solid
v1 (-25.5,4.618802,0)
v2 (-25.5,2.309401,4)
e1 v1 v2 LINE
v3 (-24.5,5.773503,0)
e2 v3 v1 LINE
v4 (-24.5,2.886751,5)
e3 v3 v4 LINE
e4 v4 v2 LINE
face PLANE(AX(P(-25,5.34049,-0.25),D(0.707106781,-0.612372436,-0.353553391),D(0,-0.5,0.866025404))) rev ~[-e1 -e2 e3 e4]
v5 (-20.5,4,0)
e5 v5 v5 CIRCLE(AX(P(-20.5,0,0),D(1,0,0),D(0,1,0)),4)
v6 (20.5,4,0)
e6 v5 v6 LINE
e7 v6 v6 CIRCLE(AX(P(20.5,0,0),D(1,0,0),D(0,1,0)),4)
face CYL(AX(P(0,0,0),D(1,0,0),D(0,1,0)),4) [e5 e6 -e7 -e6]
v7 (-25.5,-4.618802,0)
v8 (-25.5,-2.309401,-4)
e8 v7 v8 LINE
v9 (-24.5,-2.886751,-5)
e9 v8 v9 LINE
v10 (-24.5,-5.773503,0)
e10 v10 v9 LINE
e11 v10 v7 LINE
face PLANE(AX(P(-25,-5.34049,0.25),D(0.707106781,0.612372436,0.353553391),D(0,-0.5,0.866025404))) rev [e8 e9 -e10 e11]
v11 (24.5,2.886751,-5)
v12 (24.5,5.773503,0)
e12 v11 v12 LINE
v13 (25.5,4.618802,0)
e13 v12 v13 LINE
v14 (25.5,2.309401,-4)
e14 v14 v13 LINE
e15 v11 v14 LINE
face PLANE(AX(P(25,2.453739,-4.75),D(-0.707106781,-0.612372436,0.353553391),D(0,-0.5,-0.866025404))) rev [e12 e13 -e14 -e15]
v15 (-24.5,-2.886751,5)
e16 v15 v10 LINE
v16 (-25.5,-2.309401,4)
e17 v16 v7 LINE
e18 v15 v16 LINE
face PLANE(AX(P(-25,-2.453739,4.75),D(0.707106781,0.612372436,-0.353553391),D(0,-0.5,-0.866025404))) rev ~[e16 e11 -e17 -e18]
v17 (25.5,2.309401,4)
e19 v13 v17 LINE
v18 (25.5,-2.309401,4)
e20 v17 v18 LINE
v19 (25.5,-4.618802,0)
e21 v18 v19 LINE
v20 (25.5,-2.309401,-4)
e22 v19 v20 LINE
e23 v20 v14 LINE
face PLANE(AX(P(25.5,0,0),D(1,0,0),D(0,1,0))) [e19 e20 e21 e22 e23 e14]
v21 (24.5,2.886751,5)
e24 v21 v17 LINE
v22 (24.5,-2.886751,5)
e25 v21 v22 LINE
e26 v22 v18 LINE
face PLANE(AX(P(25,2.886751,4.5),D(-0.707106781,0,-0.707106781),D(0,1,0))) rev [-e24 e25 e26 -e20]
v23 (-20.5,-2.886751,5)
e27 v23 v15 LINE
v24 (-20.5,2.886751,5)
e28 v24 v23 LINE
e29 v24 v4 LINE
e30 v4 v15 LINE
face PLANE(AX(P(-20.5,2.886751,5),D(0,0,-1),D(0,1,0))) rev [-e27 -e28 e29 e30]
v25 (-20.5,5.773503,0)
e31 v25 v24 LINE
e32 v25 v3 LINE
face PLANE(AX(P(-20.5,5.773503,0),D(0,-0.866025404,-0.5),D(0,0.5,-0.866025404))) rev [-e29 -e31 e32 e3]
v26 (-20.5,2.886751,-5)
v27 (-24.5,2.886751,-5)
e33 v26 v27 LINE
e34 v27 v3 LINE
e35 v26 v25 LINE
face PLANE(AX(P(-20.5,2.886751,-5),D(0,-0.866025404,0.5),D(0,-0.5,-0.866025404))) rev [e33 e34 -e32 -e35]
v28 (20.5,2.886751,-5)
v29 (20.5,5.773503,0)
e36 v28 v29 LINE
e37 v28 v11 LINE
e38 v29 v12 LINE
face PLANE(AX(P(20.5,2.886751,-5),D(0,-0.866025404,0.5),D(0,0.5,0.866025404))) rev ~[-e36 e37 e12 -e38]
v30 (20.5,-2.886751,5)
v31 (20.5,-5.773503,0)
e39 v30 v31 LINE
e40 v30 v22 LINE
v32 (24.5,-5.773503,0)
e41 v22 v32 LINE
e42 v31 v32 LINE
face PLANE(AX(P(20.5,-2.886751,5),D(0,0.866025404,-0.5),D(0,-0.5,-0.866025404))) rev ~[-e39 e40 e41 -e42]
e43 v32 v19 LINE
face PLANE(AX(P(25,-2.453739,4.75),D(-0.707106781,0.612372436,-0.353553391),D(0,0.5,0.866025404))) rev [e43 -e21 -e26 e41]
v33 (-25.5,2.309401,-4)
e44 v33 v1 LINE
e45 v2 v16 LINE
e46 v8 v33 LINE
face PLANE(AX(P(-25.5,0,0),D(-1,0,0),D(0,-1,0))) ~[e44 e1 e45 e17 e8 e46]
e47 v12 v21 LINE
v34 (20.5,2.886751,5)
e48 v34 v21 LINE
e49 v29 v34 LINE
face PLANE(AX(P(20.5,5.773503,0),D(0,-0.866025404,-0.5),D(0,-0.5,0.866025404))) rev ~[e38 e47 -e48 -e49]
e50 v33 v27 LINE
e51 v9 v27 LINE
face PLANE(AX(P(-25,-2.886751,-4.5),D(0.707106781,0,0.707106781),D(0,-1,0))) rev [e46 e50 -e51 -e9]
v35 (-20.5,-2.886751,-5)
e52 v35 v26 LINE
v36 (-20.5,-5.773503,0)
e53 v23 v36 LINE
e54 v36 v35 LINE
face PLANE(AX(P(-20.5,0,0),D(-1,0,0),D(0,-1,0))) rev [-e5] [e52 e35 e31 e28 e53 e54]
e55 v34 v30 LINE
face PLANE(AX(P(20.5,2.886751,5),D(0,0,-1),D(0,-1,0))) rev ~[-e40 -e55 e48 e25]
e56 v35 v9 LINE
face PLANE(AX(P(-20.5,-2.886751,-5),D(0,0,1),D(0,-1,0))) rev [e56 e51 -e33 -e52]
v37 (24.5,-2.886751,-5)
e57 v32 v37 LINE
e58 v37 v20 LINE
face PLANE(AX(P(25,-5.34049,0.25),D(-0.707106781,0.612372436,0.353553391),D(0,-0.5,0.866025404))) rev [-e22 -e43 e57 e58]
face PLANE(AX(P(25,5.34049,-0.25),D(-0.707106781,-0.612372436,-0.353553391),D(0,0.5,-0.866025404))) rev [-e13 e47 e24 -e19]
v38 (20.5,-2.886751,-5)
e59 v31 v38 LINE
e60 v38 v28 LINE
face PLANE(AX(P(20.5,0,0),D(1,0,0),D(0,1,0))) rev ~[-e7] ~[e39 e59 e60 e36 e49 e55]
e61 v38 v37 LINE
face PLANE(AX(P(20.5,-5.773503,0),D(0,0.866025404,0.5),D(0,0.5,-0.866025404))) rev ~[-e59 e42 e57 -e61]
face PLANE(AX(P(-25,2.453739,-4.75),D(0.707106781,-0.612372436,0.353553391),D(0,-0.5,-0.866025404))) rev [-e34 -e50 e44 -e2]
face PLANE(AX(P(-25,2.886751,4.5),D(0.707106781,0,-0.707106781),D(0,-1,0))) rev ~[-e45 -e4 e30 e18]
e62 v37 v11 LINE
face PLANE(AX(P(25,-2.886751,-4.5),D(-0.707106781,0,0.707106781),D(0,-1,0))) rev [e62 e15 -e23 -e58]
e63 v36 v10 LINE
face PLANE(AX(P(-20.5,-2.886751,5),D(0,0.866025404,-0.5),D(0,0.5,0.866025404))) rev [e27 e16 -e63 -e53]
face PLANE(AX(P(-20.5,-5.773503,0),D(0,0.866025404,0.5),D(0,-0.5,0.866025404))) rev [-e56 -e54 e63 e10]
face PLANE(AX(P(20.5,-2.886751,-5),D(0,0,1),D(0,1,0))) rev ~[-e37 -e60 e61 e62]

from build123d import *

# Parameters (mm, degrees)
F0_R     = 4
F1_DEPTH = 20.5
F3_DEPTH = 5
F4_SIZE  = 1


# Not quite as in the source:
# - a pattern or mirror of a feature is missing from the dataset's text; its kind, count and spacing are read off the source's solid


with BuildPart() as f1:
    # F0 (on Right) → F1 (new body, symmetric)
    with BuildSketch(Plane.YZ):
        Circle(F0_R)
    extrude(amount=F1_DEPTH, both=True)

    # F2 (on face) → F3 (join)
    with BuildSketch(Plane.YZ.offset(20.5)):
        Polygon((2.8867513459, 5), (-2.8867513459, 5), (-5.7735026919, 0), (-2.8867513459, -5), (2.8867513459, -5), (5.7735026919, 0), align=None)
    f3 = extrude(amount=F3_DEPTH)

    # F3_copies: F3 across plane
    add(f3.mirror(Plane(origin=(0, 0, 0), x_dir=(0, 0, -1), z_dir=(-1, 0, 0))))

    # F4
    f4_edges = [f1.edges().sort_by_distance(p)[0] for p in [
        (25.5, 4.330127, 2.5),
        (25.5, 0, 5),
        (25.5, -4.330127, 2.5),
        (25.5, -4.330127, -2.5),
        (25.5, 0, -5),
        (25.5, 4.330127, -2.5),
        (-25.5, 4.330127, 2.5),
        (-25.5, 4.330127, -2.5),
        (-25.5, 0, 5),
        (-25.5, -4.330127, 2.5),
        (-25.5, -4.330127, -2.5),
        (-25.5, 0, -5),
    ]]
    chamfer(f4_edges, length=F4_SIZE)


solid = f1.part
